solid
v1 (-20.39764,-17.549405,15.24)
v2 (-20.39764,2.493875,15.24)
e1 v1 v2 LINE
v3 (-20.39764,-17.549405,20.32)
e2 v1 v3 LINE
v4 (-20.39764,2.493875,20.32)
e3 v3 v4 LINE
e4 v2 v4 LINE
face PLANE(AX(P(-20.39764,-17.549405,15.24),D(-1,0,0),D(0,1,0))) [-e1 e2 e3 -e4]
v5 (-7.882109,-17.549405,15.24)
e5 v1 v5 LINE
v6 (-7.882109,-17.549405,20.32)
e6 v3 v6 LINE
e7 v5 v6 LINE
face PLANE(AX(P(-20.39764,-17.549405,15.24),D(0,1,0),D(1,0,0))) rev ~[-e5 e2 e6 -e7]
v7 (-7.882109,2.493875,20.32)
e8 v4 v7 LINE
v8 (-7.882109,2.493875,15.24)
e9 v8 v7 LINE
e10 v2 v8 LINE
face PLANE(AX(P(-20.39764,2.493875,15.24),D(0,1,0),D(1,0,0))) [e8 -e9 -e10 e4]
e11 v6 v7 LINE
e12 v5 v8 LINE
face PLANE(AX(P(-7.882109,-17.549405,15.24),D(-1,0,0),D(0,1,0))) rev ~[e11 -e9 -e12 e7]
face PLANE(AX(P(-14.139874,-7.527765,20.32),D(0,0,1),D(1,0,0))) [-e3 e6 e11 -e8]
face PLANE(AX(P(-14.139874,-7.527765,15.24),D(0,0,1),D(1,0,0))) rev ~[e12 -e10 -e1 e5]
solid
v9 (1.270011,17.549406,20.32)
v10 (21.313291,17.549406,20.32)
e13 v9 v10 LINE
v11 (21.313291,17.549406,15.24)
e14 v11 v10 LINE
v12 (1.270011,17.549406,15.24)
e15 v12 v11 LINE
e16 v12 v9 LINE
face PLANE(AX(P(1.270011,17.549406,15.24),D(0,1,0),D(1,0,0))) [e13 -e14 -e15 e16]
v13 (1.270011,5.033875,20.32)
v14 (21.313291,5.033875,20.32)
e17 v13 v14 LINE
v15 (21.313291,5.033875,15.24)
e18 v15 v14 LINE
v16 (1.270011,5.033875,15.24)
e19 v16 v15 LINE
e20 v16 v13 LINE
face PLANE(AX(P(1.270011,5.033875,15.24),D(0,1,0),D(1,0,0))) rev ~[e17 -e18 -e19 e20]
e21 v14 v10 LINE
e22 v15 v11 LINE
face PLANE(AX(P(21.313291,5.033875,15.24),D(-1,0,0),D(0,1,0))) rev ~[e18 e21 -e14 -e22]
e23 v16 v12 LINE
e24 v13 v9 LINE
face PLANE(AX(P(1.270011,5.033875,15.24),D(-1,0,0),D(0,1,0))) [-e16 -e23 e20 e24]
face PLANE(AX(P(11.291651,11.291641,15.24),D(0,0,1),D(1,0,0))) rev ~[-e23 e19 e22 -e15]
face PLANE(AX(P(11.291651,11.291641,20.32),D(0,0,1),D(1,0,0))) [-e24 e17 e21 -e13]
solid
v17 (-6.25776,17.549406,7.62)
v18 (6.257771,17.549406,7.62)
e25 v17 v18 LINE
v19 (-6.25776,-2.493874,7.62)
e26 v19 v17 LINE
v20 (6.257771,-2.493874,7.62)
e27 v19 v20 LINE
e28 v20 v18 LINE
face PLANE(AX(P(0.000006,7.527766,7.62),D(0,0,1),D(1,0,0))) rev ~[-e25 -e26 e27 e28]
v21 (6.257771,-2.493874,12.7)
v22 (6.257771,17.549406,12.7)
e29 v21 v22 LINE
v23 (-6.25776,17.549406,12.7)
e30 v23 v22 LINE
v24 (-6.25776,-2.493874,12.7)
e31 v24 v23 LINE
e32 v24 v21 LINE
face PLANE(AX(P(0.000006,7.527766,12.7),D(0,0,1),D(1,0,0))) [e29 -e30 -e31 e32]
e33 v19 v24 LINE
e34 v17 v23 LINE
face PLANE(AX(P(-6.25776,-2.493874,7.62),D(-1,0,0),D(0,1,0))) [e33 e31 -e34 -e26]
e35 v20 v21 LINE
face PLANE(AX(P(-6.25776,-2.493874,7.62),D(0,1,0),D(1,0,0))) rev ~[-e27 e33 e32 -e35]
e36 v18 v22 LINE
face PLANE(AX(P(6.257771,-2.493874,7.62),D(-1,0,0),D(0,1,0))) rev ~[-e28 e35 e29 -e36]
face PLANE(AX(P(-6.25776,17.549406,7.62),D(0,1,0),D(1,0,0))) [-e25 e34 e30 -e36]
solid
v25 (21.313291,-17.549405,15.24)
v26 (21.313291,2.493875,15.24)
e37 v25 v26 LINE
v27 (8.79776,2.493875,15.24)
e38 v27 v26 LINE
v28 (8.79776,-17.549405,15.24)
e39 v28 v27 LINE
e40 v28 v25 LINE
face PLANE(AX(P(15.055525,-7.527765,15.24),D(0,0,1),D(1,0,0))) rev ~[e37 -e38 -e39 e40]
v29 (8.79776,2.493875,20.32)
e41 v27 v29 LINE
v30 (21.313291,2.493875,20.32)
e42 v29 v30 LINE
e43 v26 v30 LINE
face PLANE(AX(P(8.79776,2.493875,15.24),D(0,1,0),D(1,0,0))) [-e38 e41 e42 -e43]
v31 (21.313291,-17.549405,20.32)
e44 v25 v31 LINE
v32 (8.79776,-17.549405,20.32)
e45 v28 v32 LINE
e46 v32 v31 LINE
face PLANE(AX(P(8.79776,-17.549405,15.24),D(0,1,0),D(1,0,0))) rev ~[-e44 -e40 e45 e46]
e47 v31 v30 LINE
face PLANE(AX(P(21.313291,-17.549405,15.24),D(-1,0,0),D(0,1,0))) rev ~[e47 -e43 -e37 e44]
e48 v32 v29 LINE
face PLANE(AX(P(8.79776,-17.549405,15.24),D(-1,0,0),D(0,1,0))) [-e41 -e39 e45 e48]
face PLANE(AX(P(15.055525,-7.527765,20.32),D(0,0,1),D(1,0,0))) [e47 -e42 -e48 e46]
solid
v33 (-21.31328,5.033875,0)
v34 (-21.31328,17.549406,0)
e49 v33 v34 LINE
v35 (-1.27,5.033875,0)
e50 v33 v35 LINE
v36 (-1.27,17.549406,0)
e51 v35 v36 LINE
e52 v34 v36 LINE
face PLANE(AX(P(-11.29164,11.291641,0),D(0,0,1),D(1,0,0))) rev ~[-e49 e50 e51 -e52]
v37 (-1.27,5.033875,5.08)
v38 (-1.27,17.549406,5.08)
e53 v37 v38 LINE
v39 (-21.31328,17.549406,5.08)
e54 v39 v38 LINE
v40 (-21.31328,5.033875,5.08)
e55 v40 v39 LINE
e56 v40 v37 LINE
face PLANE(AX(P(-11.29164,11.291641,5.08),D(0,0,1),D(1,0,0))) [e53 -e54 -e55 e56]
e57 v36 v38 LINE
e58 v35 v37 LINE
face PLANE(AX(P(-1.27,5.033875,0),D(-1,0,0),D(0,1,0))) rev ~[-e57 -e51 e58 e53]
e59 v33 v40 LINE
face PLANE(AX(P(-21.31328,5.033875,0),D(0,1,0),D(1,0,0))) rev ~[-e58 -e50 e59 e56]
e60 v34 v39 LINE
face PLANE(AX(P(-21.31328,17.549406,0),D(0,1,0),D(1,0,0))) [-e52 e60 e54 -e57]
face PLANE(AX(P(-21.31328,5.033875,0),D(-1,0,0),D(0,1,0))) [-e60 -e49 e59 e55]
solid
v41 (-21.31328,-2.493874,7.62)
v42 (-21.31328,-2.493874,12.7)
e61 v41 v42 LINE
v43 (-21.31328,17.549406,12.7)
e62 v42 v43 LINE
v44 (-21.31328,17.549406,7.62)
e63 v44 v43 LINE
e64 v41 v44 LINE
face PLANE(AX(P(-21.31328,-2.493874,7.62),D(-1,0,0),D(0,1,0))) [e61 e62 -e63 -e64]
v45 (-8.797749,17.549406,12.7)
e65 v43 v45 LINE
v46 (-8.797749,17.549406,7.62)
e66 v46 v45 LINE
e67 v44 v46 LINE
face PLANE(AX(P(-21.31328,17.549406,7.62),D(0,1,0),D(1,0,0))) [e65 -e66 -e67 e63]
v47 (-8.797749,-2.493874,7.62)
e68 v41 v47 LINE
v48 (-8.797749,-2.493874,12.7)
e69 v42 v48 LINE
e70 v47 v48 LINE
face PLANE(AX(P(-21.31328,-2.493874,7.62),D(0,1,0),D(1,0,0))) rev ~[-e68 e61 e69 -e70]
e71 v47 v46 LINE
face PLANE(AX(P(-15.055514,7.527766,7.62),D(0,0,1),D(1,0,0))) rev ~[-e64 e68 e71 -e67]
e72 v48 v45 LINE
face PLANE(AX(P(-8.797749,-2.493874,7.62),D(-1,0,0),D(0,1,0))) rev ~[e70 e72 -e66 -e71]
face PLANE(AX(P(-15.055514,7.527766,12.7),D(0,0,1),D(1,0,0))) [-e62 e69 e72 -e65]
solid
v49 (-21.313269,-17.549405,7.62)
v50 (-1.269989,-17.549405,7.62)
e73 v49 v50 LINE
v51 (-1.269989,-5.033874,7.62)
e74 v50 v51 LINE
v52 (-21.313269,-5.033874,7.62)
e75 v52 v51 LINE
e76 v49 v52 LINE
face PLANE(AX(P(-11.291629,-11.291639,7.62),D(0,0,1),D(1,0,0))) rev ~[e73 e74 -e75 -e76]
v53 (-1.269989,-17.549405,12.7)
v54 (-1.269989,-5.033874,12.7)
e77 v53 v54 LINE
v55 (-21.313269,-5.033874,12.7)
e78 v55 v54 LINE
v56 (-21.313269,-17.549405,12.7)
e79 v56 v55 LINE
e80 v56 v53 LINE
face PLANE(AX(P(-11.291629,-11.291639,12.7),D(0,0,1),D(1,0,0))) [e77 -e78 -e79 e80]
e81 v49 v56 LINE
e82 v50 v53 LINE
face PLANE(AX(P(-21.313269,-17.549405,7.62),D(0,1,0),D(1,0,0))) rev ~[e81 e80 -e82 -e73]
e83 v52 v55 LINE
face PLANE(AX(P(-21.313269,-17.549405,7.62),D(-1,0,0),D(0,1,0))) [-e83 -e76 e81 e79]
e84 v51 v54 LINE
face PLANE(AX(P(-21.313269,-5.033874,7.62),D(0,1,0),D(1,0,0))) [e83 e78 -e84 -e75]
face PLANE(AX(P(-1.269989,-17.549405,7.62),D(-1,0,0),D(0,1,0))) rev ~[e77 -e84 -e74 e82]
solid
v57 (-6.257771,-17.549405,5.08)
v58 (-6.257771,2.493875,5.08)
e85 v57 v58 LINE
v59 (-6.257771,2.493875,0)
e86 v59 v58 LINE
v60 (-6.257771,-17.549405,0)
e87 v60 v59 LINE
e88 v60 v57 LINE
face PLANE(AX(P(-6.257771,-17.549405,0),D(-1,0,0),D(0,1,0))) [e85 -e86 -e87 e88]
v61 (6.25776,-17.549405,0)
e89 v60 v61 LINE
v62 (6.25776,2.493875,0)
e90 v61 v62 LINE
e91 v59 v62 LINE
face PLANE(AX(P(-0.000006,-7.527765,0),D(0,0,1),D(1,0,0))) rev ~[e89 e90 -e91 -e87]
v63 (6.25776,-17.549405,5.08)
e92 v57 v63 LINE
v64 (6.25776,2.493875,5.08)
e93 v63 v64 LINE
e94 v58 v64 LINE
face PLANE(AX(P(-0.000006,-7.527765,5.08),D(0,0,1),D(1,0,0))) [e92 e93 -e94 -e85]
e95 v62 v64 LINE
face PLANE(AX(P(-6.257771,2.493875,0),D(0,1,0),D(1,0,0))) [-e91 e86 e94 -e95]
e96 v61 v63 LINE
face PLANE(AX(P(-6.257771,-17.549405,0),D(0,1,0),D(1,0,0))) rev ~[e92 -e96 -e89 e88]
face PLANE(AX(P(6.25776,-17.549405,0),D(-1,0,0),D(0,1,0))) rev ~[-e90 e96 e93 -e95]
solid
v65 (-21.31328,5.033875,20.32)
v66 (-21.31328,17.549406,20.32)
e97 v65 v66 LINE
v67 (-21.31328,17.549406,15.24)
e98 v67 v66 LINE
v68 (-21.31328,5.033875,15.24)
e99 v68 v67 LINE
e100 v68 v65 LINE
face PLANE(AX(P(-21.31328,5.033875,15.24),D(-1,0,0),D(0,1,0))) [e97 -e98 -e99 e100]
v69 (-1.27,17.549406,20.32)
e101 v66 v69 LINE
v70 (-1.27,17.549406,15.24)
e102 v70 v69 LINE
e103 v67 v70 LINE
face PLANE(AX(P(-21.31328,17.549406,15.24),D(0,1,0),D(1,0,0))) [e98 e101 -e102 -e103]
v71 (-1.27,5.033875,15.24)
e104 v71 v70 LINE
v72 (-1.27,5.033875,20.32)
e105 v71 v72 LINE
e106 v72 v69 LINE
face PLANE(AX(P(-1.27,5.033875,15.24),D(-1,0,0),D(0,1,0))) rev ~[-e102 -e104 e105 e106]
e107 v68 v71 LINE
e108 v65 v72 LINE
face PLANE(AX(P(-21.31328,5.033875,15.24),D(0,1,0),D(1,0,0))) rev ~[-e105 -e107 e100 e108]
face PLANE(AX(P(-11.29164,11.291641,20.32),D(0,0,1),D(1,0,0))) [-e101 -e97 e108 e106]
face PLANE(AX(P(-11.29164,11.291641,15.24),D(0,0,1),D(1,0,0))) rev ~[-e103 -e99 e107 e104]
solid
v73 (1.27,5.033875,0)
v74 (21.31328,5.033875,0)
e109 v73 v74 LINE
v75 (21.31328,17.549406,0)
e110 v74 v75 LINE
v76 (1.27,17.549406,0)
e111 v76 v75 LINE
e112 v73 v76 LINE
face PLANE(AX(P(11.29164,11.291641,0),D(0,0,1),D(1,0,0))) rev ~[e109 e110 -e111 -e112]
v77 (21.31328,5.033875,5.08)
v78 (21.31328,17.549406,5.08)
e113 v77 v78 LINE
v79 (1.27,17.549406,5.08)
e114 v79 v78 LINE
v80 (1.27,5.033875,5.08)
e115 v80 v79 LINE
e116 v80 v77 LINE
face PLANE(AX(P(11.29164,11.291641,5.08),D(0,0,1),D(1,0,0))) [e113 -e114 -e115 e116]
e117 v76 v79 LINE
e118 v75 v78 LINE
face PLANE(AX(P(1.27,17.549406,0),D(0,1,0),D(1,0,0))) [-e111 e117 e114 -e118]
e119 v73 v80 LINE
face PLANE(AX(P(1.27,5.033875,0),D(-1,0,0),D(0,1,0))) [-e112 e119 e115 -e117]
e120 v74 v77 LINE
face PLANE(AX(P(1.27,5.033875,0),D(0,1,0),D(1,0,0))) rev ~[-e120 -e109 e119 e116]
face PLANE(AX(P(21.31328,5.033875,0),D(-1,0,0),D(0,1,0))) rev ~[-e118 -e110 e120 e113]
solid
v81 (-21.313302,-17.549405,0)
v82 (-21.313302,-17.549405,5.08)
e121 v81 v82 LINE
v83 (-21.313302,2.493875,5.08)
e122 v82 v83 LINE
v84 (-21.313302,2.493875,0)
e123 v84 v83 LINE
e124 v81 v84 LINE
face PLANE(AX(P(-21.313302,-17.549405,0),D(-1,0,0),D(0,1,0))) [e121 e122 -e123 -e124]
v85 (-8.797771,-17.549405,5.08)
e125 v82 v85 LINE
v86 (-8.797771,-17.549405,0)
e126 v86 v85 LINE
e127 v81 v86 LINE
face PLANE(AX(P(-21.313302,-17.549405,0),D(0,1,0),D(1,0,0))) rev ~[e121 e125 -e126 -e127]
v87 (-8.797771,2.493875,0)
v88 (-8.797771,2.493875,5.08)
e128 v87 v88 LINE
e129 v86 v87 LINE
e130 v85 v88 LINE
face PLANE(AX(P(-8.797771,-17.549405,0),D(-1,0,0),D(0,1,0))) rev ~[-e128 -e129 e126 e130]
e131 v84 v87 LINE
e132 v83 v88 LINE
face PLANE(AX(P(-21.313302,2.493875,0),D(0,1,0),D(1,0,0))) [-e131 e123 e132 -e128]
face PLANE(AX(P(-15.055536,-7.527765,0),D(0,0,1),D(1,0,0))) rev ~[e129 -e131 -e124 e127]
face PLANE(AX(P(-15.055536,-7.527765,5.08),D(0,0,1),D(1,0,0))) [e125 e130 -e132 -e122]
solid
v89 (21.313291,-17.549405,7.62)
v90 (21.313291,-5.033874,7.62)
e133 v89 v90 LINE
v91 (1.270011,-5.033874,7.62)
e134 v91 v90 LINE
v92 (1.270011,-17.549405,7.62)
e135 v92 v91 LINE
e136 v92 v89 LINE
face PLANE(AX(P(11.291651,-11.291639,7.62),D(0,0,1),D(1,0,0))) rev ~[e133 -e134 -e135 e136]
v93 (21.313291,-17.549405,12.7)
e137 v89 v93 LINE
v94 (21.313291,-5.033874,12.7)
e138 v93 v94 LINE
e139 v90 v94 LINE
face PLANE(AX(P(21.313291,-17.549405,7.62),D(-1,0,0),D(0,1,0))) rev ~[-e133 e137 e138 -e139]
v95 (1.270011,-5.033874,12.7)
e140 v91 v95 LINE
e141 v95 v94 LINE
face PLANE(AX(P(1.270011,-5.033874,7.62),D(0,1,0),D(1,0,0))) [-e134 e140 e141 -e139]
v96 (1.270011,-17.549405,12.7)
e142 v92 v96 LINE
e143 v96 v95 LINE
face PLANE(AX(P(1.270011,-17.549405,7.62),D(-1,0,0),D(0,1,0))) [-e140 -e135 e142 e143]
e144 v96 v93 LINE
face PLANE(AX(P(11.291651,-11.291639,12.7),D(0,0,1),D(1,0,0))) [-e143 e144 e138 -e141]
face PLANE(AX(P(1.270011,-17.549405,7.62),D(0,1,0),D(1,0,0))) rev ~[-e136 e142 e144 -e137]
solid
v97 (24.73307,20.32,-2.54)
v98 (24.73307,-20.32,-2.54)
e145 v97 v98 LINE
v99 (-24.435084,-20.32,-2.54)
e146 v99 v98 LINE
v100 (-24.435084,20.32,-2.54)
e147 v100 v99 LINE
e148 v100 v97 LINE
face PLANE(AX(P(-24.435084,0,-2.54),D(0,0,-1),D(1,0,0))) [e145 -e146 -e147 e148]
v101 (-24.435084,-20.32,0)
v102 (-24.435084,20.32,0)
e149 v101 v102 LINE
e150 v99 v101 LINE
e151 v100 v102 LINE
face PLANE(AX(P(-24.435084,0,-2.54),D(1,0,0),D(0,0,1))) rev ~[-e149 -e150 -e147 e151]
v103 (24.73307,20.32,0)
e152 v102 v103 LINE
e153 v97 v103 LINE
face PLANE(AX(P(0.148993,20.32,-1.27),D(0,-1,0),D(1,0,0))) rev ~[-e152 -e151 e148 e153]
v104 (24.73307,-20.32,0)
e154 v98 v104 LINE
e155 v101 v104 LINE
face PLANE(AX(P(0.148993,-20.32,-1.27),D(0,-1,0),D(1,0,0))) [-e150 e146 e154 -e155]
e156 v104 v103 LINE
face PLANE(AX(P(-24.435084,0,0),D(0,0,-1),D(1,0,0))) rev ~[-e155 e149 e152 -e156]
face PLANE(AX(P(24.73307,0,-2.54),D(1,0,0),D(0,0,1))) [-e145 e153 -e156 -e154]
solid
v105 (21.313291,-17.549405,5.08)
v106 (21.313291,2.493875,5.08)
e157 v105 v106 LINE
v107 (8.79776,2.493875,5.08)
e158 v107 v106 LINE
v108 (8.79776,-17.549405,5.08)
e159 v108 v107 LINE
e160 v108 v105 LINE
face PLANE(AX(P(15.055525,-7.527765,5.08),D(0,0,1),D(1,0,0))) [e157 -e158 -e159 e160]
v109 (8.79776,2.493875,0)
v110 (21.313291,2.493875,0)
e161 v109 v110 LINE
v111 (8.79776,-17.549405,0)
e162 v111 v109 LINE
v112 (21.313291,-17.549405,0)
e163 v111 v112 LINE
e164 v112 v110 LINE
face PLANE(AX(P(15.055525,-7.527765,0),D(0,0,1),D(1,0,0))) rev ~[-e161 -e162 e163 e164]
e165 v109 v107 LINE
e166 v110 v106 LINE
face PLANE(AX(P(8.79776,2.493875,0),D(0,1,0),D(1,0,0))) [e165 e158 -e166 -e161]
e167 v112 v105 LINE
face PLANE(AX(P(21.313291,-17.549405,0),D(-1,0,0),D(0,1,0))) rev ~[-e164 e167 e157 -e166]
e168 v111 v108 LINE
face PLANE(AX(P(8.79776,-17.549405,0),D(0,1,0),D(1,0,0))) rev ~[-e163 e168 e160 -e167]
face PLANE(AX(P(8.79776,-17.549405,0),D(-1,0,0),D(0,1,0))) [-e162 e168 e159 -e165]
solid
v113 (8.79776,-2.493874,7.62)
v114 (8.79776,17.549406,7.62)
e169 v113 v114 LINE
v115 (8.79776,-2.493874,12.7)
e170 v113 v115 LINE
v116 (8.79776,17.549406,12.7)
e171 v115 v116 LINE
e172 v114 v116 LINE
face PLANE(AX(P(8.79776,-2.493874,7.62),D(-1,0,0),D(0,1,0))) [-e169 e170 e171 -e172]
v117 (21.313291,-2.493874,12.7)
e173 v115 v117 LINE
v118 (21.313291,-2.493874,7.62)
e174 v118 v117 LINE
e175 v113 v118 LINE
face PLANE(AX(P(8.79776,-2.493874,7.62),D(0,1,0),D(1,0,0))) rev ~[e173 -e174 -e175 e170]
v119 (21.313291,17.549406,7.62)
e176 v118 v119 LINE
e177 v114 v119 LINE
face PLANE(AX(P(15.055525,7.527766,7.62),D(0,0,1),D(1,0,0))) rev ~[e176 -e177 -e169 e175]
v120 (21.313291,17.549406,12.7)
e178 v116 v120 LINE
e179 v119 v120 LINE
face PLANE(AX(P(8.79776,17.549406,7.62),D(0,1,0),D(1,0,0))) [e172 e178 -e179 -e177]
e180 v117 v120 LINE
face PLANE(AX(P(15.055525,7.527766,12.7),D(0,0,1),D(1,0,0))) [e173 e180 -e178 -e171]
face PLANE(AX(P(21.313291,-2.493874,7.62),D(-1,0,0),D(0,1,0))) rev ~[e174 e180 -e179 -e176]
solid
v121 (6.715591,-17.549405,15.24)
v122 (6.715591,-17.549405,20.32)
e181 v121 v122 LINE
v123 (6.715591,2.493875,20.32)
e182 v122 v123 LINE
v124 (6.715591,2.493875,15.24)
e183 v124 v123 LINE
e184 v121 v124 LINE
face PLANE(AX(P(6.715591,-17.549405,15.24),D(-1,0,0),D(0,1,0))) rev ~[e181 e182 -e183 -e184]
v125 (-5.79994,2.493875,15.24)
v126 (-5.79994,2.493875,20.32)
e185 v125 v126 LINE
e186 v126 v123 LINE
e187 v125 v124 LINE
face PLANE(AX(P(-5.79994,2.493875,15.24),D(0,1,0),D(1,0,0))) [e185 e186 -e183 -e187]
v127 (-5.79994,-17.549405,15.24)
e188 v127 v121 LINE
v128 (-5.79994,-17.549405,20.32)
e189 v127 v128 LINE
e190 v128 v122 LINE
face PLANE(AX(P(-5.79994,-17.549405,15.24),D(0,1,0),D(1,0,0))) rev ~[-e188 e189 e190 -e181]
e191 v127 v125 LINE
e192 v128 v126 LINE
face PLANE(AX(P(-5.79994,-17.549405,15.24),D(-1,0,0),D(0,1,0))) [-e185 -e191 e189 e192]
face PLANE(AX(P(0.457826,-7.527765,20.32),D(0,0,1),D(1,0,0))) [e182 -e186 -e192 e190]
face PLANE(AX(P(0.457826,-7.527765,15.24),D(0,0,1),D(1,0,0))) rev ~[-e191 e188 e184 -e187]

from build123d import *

# Parameters (mm, degrees)
F0_W     = 20.0432797
F0_H     = 12.5155309215
F1_DEPTH = 5.08
F0_W_2   = 12.5155309215
F0_H_2   = 20.0432797
F2_W     = 49.1681545973
F2_H     = 2.54
F3_DEPTH = 20.32
F5_W     = 12.5155309215
F5_H     = 20.0432797
F6_DEPTH = 5.08
F5_W_2   = 20.0432797
F5_H_2   = 12.5155309215
F8_W     = 20.0432797
F8_H     = 12.5155309215
F9_DEPTH = 5.08
F8_W_2   = 12.5155309215
F8_H_2   = 20.0432797


with BuildPart() as f1:
    # F0 (on Top) → F1 (new body)
    with BuildSketch(Plane.XY):
        with Locations((11.29163985, 11.2916406392)):
            Rectangle(F0_W, F0_H)
    extrude(amount=F1_DEPTH)


with BuildPart() as f1b:
    # F0 (on Top) → F1, piece 2 (new body)
    with BuildSketch(Plane.XY):
        with Locations((15.0555253608, -7.5277646715)):
            Rectangle(F0_W_2, F0_H_2)
    extrude(amount=F1_DEPTH)


with BuildPart() as f1c:
    # F0 (on Top) → F1, piece 3 (new body)
    with BuildSketch(Plane.XY):
        with Locations((-5.5608e-06, -7.5277646715)):
            Rectangle(F0_W_2, F0_H_2)
    extrude(amount=F1_DEPTH)


with BuildPart() as f1d:
    # F0 (on Top) → F1, piece 4 (new body)
    with BuildSketch(Plane.XY):
        with Locations((-15.0555364823, -7.5277646715)):
            Rectangle(F0_W_2, F0_H_2)
    extrude(amount=F1_DEPTH)


with BuildPart() as f1e:
    # F0 (on Top) → F1, piece 5 (new body)
    with BuildSketch(Plane.XY):
        with Locations((-11.29163985, 11.2916406392)):
            Rectangle(F0_W, F0_H)
    extrude(amount=F1_DEPTH)


with BuildPart() as f3:
    # F2 (on Front) → F3 (new body, symmetric)
    with BuildSketch(Plane.XZ):
        with Locations((0.1489929855, -1.27)):
            Rectangle(F2_W, F2_H)
    extrude(amount=F3_DEPTH, both=True)


with BuildPart() as f6:
    # F5 (on offset) → F6 (new body)
    with BuildSketch(Plane.XY.offset(7.62)):
        with Locations((5.5608e-06, 7.52776625)):
            Rectangle(F5_W, F5_H)
    extrude(amount=F6_DEPTH)


with BuildPart() as f6b:
    # F5 (on offset) → F6, piece 2 (new body)
    with BuildSketch(Plane.XY.offset(7.62)):
        with Locations((15.0555253608, 7.52776625)):
            Rectangle(F5_W, F5_H)
    extrude(amount=F6_DEPTH)


with BuildPart() as f6c:
    # F5 (on offset) → F6, piece 3 (new body)
    with BuildSketch(Plane.XY.offset(7.62)):
        with Locations((11.2916509715, -11.2916390608)):
            Rectangle(F5_W_2, F5_H_2)
    extrude(amount=F6_DEPTH)


with BuildPart() as f6d:
    # F5 (on offset) → F6, piece 4 (new body)
    with BuildSketch(Plane.XY.offset(7.62)):
        with Locations((-11.2916287285, -11.2916390608)):
            Rectangle(F5_W_2, F5_H_2)
    extrude(amount=F6_DEPTH)


with BuildPart() as f6e:
    # F5 (on offset) → F6, piece 5 (new body)
    with BuildSketch(Plane.XY.offset(7.62)):
        with Locations((-15.0555142392, 7.52776625)):
            Rectangle(F5_W, F5_H)
    extrude(amount=F6_DEPTH)


with BuildPart() as f9:
    # F8 (on offset) → F9 (new body)
    with BuildSketch(Plane.XY.offset(15.24)):
        with Locations((-11.29163985, 11.2916406392)):
            Rectangle(F8_W, F8_H)
    extrude(amount=F9_DEPTH)


with BuildPart() as f9b:
    # F8 (on offset) → F9, piece 2 (new body)
    with BuildSketch(Plane.XY.offset(15.24)):
        with Locations((11.2916509715, 11.2916406392)):
            Rectangle(F8_W, F8_H)
    extrude(amount=F9_DEPTH)


with BuildPart() as f9c:
    # F8 (on offset) → F9, piece 3 (new body)
    with BuildSketch(Plane.XY.offset(15.24)):
        with Locations((15.0555253608, -7.5277646715)):
            Rectangle(F8_W_2, F8_H_2)
    extrude(amount=F9_DEPTH)


with BuildPart() as f9d:
    # F8 (on offset) → F9, piece 4 (new body)
    with BuildSketch(Plane.XY.offset(15.24)):
        with Locations((0.4578256088, -7.5277646715)):
            Rectangle(F8_W_2, F8_H_2)
    extrude(amount=F9_DEPTH)


with BuildPart() as f9e:
    # F8 (on offset) → F9, piece 5 (new body)
    with BuildSketch(Plane.XY.offset(15.24)):
        with Locations((-14.1398741431, -7.5277646715)):
            Rectangle(F8_W_2, F8_H_2)
    extrude(amount=F9_DEPTH)


solid = Compound([f1.part, f1b.part, f1c.part, f1d.part, f1e.part, f3.part, f6.part, f6b.part, f6c.part, f6d.part, f6e.part, f9.part, f9b.part, f9c.part, f9d.part, f9e.part])
